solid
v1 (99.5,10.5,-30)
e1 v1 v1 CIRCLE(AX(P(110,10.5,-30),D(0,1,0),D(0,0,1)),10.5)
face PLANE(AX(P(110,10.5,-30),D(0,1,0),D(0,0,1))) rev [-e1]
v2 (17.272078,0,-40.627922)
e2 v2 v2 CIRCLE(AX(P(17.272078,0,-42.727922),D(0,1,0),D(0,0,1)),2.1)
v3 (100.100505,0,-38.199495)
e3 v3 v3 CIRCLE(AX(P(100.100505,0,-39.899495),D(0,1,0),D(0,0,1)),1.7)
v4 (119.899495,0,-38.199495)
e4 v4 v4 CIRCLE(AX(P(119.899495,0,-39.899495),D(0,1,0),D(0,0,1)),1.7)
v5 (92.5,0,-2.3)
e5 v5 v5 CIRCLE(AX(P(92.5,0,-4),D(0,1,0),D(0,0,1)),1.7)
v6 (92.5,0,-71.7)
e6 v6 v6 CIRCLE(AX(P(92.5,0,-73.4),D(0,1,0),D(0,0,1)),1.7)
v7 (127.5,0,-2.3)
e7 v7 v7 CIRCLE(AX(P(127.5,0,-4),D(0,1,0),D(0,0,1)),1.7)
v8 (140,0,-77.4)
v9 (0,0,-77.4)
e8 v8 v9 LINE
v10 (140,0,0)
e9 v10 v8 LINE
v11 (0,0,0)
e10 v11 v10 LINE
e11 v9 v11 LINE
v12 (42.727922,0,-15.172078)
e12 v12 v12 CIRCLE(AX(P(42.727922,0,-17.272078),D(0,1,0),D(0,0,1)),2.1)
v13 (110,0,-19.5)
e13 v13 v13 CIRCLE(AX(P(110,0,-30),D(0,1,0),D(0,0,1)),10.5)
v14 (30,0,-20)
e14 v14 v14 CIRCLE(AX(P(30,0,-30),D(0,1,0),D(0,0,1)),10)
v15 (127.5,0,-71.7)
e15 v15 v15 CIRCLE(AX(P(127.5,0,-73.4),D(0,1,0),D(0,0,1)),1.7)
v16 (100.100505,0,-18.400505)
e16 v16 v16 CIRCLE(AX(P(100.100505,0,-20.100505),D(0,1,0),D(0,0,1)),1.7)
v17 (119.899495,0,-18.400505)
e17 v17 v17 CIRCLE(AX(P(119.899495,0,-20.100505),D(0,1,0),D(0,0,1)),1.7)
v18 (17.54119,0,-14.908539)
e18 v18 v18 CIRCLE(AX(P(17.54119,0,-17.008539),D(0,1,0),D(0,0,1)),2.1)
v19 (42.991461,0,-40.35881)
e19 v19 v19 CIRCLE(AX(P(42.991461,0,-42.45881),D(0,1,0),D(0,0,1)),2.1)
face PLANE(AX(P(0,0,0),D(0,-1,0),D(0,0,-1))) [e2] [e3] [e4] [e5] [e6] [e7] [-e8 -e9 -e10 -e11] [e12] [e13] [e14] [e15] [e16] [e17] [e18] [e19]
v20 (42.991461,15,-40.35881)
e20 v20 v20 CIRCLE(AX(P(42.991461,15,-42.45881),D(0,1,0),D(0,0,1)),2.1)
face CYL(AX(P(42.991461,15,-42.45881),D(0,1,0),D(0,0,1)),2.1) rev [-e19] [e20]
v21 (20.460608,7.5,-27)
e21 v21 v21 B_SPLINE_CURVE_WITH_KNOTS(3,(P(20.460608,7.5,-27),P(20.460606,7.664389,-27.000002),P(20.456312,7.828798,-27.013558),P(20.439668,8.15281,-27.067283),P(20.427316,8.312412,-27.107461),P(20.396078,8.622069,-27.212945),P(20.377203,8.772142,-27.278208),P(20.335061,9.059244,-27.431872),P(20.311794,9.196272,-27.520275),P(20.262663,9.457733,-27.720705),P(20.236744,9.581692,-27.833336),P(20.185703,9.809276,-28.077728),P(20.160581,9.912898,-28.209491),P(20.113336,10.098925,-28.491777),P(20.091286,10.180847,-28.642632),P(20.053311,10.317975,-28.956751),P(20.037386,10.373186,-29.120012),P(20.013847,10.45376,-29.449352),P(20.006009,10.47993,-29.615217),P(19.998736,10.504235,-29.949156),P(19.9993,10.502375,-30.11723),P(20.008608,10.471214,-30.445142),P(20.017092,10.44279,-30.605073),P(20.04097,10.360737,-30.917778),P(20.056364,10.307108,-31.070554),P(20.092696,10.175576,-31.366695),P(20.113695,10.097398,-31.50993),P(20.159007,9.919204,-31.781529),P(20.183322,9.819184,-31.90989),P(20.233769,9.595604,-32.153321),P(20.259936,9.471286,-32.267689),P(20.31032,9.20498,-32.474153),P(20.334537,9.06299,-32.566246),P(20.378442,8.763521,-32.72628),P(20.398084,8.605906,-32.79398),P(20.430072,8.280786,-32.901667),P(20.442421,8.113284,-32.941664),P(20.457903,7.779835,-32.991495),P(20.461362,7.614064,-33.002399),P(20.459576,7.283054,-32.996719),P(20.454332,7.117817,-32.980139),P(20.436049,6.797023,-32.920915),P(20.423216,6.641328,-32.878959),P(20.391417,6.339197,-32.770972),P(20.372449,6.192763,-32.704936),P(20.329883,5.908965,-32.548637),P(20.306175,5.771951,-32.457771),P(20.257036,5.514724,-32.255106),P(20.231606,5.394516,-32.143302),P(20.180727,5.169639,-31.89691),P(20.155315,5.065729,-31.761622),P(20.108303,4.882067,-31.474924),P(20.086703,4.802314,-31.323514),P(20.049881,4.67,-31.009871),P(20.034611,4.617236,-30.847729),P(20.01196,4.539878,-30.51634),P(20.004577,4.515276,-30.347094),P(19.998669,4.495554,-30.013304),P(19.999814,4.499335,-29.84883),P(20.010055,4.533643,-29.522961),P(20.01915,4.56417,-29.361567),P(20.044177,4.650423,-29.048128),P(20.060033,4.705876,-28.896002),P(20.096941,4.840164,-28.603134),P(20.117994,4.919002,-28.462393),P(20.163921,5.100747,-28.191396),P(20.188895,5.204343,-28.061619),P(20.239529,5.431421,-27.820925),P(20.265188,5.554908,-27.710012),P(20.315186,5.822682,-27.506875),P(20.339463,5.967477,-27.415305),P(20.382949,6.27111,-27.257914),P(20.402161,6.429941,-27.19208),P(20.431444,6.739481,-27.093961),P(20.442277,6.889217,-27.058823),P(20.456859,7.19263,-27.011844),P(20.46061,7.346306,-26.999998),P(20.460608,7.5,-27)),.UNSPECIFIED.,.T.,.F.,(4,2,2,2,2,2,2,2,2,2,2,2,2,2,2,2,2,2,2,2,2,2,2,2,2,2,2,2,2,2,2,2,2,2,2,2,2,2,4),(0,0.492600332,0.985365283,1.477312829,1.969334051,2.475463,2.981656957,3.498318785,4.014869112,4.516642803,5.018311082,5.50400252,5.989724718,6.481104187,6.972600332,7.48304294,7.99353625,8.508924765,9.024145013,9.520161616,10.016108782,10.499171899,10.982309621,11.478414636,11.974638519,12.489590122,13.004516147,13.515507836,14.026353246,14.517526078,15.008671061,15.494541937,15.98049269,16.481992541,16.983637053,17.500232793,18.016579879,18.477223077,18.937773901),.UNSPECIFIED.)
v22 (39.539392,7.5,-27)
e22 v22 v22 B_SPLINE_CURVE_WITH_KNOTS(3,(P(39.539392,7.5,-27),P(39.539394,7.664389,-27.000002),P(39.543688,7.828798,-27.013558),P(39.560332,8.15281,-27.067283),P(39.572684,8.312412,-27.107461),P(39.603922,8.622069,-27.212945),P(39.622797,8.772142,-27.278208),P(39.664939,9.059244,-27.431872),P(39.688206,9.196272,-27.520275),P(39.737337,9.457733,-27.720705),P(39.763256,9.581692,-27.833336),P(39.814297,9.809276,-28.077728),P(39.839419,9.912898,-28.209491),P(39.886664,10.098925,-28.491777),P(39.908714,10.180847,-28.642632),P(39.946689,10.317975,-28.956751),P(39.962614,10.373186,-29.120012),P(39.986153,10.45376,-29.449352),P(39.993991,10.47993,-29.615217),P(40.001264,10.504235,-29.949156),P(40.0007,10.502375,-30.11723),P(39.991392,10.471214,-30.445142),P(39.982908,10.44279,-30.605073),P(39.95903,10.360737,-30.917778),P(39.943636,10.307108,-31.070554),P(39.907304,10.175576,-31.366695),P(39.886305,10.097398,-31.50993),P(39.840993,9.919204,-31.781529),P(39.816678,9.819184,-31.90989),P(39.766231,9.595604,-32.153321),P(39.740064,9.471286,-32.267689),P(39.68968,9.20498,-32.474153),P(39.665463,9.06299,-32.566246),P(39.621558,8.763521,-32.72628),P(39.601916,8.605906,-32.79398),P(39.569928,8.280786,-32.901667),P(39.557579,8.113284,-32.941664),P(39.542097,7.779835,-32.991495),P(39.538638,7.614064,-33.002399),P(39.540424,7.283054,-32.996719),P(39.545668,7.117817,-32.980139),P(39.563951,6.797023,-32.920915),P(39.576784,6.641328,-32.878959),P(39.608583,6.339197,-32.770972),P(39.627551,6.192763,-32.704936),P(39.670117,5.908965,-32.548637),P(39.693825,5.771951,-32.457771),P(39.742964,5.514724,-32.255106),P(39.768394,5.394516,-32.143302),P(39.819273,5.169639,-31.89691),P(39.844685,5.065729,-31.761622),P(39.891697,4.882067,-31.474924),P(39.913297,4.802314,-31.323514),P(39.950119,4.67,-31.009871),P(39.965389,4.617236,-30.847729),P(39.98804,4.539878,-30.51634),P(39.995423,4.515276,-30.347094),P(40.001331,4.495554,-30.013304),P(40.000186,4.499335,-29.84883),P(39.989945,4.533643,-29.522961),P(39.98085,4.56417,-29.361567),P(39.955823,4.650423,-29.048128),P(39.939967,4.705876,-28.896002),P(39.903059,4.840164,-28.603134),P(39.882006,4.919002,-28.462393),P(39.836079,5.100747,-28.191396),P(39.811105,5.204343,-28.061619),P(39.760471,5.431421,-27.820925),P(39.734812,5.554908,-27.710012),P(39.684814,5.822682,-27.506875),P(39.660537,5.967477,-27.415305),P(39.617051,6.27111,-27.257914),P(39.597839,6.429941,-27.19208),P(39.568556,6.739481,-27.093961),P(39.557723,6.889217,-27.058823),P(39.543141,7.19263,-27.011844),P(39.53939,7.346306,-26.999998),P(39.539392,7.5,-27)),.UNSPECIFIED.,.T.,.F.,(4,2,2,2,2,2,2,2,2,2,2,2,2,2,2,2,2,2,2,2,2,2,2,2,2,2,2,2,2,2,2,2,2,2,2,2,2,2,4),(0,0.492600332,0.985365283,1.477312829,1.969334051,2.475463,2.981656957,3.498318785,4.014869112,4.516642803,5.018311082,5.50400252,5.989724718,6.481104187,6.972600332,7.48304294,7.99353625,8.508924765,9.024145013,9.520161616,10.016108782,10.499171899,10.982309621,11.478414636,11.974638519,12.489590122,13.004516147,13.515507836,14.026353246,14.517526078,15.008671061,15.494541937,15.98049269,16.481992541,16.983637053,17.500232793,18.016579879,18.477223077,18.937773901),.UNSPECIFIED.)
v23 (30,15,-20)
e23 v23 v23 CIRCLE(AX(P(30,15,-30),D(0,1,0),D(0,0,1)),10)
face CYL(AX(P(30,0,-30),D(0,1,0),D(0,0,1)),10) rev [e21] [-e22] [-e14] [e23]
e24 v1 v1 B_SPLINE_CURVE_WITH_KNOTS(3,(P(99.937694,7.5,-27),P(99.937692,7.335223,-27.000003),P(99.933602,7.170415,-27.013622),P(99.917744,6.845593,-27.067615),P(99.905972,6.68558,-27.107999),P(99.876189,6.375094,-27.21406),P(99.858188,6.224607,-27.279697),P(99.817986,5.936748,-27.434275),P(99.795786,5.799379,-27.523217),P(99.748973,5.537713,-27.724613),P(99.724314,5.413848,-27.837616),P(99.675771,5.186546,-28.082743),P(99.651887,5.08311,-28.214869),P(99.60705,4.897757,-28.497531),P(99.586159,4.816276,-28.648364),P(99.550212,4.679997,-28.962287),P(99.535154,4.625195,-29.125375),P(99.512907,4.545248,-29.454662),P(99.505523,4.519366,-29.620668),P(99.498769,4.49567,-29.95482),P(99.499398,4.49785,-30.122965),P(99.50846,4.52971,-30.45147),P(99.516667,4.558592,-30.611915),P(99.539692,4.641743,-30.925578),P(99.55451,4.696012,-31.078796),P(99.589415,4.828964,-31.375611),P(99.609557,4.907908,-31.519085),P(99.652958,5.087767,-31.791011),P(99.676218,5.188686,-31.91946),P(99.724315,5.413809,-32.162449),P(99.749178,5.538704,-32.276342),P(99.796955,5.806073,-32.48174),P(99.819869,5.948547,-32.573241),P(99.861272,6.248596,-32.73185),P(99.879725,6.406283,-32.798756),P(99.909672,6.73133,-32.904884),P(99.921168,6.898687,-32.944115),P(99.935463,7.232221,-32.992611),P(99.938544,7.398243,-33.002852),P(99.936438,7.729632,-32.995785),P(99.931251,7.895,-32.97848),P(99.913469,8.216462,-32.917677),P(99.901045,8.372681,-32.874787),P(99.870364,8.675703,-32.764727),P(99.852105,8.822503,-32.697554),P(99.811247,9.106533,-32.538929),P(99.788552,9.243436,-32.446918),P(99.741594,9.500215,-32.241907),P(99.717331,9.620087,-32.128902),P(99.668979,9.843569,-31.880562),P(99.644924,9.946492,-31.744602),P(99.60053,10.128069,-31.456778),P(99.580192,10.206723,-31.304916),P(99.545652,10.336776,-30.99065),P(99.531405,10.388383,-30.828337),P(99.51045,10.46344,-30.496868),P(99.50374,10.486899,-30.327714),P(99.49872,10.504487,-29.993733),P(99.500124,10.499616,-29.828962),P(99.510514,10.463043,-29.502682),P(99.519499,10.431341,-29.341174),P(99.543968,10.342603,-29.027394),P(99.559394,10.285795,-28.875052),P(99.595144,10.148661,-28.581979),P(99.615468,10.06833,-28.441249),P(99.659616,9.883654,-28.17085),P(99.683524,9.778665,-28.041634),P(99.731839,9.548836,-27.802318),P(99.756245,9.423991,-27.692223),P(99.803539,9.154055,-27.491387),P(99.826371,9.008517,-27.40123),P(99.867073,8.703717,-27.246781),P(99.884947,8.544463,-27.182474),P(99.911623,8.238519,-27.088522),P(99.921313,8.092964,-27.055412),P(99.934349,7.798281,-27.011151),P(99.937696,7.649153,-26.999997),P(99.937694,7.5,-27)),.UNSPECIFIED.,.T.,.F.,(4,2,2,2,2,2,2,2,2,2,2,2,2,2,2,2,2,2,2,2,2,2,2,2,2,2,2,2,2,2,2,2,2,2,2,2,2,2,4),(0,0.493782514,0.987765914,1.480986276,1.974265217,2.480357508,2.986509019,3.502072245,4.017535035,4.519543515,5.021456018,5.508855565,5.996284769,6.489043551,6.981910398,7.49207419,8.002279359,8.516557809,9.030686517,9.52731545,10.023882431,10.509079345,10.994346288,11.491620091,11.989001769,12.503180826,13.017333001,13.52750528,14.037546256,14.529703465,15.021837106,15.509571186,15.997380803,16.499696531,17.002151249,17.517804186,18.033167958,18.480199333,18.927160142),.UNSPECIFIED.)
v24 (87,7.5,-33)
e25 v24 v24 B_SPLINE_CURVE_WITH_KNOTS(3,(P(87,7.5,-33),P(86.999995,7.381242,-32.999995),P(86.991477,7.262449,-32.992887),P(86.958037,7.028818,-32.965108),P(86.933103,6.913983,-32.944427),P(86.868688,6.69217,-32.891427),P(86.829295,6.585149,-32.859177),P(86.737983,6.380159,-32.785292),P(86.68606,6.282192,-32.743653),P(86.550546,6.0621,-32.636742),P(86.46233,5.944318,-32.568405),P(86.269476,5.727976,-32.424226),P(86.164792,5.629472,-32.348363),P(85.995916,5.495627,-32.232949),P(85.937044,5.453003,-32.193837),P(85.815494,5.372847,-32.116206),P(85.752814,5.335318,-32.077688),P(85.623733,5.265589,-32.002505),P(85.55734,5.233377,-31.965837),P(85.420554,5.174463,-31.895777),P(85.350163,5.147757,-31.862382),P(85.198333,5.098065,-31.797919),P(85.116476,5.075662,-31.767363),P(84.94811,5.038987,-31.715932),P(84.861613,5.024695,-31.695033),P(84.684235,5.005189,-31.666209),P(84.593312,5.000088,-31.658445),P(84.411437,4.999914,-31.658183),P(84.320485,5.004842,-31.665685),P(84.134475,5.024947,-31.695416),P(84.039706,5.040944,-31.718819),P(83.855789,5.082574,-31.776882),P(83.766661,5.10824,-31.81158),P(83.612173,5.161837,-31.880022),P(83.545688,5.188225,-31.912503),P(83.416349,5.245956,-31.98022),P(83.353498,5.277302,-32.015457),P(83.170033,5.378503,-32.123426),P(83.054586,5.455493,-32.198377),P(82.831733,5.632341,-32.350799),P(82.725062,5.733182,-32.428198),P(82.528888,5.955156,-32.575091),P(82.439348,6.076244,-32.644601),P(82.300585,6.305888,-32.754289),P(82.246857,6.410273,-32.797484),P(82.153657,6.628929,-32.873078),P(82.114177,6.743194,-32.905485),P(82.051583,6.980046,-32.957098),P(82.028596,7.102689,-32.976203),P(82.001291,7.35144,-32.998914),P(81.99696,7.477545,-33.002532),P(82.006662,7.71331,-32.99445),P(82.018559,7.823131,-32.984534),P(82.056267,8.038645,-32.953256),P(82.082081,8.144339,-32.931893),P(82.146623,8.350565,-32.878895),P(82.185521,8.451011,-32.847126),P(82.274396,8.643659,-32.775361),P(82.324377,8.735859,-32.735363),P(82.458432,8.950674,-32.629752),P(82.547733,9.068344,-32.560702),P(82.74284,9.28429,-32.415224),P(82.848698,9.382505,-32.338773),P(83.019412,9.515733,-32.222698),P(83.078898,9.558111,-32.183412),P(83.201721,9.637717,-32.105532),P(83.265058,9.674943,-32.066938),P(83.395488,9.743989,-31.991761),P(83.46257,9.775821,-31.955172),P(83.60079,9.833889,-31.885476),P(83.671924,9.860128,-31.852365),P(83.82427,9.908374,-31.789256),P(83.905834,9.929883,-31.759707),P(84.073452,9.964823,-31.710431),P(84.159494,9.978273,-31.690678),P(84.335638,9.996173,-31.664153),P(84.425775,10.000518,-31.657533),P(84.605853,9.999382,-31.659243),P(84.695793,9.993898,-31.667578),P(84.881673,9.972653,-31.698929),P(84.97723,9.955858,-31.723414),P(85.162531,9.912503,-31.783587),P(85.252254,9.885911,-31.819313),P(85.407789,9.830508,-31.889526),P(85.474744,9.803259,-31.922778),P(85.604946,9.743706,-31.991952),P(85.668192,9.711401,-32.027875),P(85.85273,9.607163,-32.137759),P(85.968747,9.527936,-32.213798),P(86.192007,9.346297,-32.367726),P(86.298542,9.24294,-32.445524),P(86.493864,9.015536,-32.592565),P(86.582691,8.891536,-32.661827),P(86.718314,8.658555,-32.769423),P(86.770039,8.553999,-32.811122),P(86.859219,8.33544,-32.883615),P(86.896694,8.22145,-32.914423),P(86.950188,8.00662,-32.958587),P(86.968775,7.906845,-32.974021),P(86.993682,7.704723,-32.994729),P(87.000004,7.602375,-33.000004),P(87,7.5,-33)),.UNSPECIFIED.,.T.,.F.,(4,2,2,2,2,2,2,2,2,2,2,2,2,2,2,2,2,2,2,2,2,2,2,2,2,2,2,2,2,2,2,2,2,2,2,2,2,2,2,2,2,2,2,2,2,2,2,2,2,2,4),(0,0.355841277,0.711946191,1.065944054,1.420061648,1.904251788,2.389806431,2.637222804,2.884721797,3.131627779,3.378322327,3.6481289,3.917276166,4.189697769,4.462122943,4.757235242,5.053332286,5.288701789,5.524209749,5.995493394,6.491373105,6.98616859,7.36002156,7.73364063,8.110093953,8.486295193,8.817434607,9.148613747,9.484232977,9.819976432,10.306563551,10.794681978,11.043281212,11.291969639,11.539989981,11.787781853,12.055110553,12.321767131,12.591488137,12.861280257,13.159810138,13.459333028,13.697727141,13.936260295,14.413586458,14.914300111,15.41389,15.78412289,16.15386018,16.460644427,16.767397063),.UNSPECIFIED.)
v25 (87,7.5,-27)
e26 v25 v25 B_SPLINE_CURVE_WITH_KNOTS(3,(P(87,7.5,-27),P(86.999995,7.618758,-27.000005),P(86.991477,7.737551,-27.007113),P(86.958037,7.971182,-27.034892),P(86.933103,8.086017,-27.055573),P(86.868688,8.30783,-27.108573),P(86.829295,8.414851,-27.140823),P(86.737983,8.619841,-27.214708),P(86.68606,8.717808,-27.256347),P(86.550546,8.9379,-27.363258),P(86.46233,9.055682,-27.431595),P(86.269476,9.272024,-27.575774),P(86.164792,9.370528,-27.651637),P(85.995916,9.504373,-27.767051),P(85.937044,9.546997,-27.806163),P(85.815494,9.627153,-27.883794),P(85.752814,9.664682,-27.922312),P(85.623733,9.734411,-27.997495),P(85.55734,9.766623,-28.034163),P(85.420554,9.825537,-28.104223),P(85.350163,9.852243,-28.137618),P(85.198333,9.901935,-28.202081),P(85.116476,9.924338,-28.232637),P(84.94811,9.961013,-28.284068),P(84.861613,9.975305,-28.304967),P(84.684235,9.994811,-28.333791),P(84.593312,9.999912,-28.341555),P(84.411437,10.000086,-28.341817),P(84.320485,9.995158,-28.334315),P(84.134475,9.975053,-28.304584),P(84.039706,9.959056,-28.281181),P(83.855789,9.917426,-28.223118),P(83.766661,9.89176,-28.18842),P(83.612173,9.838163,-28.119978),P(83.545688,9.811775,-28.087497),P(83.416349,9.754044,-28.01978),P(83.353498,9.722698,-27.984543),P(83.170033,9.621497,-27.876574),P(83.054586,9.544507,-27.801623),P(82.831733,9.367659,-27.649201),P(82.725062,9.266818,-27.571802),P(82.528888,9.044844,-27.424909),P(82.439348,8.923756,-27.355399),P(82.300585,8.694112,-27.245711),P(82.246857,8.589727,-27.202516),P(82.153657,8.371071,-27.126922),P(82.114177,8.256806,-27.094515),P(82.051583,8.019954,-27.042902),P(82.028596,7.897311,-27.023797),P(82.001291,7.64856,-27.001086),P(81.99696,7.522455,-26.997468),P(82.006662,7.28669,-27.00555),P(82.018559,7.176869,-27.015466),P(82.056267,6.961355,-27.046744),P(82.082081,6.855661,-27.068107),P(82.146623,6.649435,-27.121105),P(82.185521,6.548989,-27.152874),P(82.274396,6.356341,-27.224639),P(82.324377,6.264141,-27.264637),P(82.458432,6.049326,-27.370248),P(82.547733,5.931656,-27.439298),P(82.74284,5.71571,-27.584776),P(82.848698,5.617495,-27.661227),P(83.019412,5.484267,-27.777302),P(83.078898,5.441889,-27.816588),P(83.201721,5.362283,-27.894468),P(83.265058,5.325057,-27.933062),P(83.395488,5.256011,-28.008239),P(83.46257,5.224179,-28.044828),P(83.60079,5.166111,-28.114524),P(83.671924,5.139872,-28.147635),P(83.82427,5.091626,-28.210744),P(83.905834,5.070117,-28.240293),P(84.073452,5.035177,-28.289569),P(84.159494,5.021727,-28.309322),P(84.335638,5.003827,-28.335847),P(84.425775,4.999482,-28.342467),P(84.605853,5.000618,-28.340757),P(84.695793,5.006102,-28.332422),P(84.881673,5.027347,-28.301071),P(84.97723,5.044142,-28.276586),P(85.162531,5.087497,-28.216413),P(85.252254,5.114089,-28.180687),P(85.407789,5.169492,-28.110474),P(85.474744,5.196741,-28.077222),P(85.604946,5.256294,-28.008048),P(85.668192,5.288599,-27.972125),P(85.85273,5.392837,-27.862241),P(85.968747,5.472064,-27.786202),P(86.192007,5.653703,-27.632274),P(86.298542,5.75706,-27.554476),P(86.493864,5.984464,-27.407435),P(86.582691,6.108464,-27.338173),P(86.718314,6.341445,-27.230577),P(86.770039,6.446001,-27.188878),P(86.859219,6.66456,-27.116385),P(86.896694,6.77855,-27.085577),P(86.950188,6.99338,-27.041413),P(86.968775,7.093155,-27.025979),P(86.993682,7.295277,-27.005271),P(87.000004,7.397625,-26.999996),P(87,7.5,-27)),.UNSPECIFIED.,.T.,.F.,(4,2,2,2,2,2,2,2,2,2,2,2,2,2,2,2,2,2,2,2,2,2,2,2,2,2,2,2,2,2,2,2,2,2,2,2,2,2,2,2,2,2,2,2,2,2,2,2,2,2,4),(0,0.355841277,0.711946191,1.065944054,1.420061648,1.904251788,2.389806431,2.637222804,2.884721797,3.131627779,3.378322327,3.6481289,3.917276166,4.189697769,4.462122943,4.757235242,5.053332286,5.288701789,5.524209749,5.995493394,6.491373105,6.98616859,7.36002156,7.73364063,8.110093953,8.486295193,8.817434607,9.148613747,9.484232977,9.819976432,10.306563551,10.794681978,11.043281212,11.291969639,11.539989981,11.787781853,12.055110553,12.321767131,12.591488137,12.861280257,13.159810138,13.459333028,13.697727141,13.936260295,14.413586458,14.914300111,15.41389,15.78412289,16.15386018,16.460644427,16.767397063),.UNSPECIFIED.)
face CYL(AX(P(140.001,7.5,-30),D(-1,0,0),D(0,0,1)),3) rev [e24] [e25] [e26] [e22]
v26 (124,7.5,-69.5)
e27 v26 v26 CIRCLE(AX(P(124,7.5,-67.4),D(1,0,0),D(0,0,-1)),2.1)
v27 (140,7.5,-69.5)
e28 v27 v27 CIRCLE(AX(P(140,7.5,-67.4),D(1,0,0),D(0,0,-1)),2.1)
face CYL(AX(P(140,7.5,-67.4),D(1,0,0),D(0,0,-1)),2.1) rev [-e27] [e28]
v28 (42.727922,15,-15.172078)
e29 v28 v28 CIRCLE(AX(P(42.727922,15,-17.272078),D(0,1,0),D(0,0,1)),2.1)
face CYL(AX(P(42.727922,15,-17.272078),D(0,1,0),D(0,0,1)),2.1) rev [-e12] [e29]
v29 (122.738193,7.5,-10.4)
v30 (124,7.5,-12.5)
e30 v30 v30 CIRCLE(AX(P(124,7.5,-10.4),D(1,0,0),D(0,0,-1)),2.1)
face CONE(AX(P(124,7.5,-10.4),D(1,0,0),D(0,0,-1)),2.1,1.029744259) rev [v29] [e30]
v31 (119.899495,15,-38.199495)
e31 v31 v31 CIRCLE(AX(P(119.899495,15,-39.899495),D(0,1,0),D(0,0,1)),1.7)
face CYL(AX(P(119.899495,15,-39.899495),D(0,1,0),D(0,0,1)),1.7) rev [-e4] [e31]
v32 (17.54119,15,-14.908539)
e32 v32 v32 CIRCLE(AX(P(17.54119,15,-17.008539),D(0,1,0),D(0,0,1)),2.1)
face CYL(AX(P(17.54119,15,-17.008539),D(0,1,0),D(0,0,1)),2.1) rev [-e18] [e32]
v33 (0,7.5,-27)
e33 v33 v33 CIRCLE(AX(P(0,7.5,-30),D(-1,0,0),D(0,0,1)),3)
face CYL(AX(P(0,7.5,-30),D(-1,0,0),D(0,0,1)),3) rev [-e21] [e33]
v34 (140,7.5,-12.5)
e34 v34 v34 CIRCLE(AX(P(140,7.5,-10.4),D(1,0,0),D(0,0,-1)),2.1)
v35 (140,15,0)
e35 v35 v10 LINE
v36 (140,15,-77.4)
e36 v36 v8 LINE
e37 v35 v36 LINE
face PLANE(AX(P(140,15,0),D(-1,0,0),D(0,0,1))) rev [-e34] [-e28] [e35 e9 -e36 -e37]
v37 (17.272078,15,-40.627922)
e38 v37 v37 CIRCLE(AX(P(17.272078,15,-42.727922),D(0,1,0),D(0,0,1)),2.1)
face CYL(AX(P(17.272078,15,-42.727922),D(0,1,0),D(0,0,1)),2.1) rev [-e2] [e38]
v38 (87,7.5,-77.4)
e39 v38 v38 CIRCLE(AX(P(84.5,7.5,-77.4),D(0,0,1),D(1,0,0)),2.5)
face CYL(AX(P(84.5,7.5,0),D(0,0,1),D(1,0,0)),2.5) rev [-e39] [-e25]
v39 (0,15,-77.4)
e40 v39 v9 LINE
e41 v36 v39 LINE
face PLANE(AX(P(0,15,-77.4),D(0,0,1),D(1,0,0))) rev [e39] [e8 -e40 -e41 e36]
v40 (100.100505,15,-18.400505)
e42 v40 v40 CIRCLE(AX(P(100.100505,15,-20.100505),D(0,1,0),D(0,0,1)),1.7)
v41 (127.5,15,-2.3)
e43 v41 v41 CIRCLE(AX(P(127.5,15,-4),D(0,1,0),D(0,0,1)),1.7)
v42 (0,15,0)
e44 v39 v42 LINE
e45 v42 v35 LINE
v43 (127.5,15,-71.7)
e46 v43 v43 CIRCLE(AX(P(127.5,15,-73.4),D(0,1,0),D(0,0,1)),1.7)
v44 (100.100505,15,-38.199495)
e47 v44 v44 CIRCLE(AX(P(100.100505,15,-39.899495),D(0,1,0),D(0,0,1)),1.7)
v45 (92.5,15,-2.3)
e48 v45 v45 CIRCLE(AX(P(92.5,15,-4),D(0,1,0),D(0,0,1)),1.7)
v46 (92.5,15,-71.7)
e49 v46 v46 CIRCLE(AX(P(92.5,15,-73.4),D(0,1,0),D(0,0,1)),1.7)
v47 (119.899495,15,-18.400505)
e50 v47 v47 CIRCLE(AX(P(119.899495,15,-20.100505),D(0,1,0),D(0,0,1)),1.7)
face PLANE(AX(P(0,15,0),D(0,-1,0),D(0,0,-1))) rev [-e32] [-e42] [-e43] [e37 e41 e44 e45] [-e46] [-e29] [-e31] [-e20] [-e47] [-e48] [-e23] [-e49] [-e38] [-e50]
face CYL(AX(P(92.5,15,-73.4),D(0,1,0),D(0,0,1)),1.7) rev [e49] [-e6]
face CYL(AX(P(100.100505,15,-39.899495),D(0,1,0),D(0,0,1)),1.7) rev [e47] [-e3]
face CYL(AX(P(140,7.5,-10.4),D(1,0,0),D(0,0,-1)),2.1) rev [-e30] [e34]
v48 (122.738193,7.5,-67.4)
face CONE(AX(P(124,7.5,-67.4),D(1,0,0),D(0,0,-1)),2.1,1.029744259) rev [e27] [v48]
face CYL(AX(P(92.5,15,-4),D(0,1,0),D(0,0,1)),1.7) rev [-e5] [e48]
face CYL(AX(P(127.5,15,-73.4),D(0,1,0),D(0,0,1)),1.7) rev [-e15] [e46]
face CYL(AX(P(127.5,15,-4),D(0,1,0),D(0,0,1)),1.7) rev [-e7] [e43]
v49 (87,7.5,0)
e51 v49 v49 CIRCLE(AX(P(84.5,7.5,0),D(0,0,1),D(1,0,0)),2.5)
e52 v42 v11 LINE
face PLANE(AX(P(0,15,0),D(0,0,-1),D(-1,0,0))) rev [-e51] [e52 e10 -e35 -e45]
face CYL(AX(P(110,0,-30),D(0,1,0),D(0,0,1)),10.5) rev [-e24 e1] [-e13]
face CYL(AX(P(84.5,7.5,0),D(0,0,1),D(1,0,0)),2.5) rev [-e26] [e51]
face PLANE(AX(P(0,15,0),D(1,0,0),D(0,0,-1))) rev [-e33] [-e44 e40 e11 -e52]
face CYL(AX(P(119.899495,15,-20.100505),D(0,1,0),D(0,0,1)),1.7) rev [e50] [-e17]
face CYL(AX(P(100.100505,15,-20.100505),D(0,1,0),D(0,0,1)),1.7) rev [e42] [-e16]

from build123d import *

# Parameters (mm, degrees)
SKETCH_1_W                 = 140
SKETCH_1_H                 = 77.4
EXTRUDE_1_DEPTH            = 15
SKETCH_6_R                 = 10.5
CUT_EXTRUDE_4_DEPTH        = 161.315345491
M5X0_8_1_D                 = 4.2
M5X0_8_1_DEPTH             = 16
M5X0_8_1_TIP               = 1.2618073
SKETCH_9_R                 = 10
CUT_EXTRUDE_6_DEPTH        = 161.67283529
M5X0_8_2_D                 = 4.2
HOLE_WIZARD_M3_1_D         = 3.4
M6X1_0_START               = -77.4
M6X1_0_3_OUTLINE_R         = 2.5
M6X1_0_3_DEPTH             = 77.4
HOLE_WIZARD_M3_2_OUTLINE_R = 1.7
HOLE_WIZARD_M3_2_DEPTH     = 15
M7X1_0_4_OUTLINE_W         = 3
M7X1_0_4_OUTLINE_H         = 20.46087378
CUT_EXTRUDE_7_REACH        = 137.336
SKETCH_27_R                = 3


# Read off the part's stored shape, not the designer's step: M6x1.0 ねじ穴3, M3 すきま穴2, M7x1.0 ねじ穴4
with BuildPart() as part:
    # ｽｹｯﾁ1 → ﾎﾞｽ - 押し出し1 (new body)
    with BuildSketch(Plane(origin=(0, 0, 0), x_dir=(1, 0, 0), z_dir=(0, 1, 0))):
        with Locations((70, 38.7)):
            Rectangle(SKETCH_1_W, SKETCH_1_H)
    extrude(amount=EXTRUDE_1_DEPTH)

    # ｽｹｯﾁ6 → ｶｯﾄ - 押し出し4 (cut, through all)
    with BuildSketch(Plane(origin=(0, 10.5, 0), x_dir=(1, 0, 0), z_dir=(0, 1, 0))):
        with Locations(Location((110, 30, 0), (0, 0, 270))):
            Circle(SKETCH_6_R)
    extrude(amount=-CUT_EXTRUDE_4_DEPTH, mode=Mode.SUBTRACT)

    # M5x0.8 ねじ穴1
    with Locations(Plane(origin=(140, 0, 0), x_dir=(0, 0, -1), z_dir=(1, 0, 0))):
        with Locations((10.4, 7.5), (67.4, 7.5)):
            Hole(M5X0_8_1_D / 2, depth=M5X0_8_1_DEPTH)
            with Locations((0, 0, -(M5X0_8_1_DEPTH + M5X0_8_1_TIP / 2))):  # 118° drill point
                Cone(0, M5X0_8_1_D / 2, M5X0_8_1_TIP, mode=Mode.SUBTRACT)

    # ｽｹｯﾁ9 → ｶｯﾄ - 押し出し6 (cut, through all)
    with BuildSketch(Plane(origin=(0, 15, 0), x_dir=(1, 0, 0), z_dir=(0, 1, 0))):
        with Locations(Location((30, 30, 0), (0, 0, 270))):
            Circle(SKETCH_9_R)
    extrude(amount=-CUT_EXTRUDE_6_DEPTH, mode=Mode.SUBTRACT)

    # M5x0.8 ねじ穴2 (through all)
    with Locations(Plane(origin=(0, 15, 0), x_dir=(1, 0, 0), z_dir=(0, 1, 0))):
        with Locations((42.991460674, 42.458810119), (17.272077939, 42.727922061), (42.727922061, 17.272077939), (17.541189881, 17.008539326)):
            Hole(M5X0_8_2_D / 2)

    # M3 すきま穴1 (through all)
    with Locations(Plane(origin=(0, 15, 0), x_dir=(1, 0, 0), z_dir=(0, 1, 0))):
        with Locations((119.899494937, 39.899494937), (119.899494937, 20.100505063), (100.100505063, 20.100505063), (100.100505063, 39.899494937)):
            Hole(HOLE_WIZARD_M3_1_D / 2)

    # M6x1.0 ねじ穴3 outline → M6x1.0 ねじ穴3 (cut)
    with BuildSketch(Plane.XY.offset(M6X1_0_START)):
        with Locations((84.5, 7.5)):
            Circle(M6X1_0_3_OUTLINE_R)
    extrude(amount=M6X1_0_3_DEPTH, mode=Mode.SUBTRACT)

    # M3 すきま穴2 outline → M3 すきま穴2 (cut)
    with BuildSketch(Plane(origin=(0, 0, 0), x_dir=(1, 0, 0), z_dir=(0, 1, 0))):
        with Locations((92.5, 73.4)):
            Circle(HOLE_WIZARD_M3_2_OUTLINE_R)
        with Locations((127.5, 73.4)):
            Circle(HOLE_WIZARD_M3_2_OUTLINE_R)
        with Locations((92.5, 4)):
            Circle(HOLE_WIZARD_M3_2_OUTLINE_R)
        with Locations((127.5, 4)):
            Circle(HOLE_WIZARD_M3_2_OUTLINE_R)
    extrude(amount=HOLE_WIZARD_M3_2_DEPTH, mode=Mode.SUBTRACT)

    # M7x1.0 ねじ穴4 outline → M7x1.0 ねじ穴4 (revolve, cut)
    with BuildSketch(Plane(origin=(0, 7.5, -30), x_dir=(0, 1, 0), z_dir=(0, 0, -1))):
        with Locations((1.5, 10.23043689)):
            Rectangle(M7X1_0_4_OUTLINE_W, M7X1_0_4_OUTLINE_H)
    revolve(axis=Axis((0, 7.5, -30), (1, 0, 0)), mode=Mode.SUBTRACT)

    # ｽｹｯﾁ27 → ｶｯﾄ - 押し出し7 (cut, up to next)
    with BuildSketch(Plane.ZY.offset(-30), mode=Mode.PRIVATE) as cut_extrude_7_sk1:
        with Locations((-30, 7.5)):
            Circle(SKETCH_27_R)
    cut_extrude_7_tool1 = extrude(cut_extrude_7_sk1.sketch, amount=-CUT_EXTRUDE_7_REACH, mode=Mode.PRIVATE) & part.part
    add(cut_extrude_7_tool1.solids().sort_by_distance((30, 7.5, -30))[0], mode=Mode.SUBTRACT)


solid = part.part
